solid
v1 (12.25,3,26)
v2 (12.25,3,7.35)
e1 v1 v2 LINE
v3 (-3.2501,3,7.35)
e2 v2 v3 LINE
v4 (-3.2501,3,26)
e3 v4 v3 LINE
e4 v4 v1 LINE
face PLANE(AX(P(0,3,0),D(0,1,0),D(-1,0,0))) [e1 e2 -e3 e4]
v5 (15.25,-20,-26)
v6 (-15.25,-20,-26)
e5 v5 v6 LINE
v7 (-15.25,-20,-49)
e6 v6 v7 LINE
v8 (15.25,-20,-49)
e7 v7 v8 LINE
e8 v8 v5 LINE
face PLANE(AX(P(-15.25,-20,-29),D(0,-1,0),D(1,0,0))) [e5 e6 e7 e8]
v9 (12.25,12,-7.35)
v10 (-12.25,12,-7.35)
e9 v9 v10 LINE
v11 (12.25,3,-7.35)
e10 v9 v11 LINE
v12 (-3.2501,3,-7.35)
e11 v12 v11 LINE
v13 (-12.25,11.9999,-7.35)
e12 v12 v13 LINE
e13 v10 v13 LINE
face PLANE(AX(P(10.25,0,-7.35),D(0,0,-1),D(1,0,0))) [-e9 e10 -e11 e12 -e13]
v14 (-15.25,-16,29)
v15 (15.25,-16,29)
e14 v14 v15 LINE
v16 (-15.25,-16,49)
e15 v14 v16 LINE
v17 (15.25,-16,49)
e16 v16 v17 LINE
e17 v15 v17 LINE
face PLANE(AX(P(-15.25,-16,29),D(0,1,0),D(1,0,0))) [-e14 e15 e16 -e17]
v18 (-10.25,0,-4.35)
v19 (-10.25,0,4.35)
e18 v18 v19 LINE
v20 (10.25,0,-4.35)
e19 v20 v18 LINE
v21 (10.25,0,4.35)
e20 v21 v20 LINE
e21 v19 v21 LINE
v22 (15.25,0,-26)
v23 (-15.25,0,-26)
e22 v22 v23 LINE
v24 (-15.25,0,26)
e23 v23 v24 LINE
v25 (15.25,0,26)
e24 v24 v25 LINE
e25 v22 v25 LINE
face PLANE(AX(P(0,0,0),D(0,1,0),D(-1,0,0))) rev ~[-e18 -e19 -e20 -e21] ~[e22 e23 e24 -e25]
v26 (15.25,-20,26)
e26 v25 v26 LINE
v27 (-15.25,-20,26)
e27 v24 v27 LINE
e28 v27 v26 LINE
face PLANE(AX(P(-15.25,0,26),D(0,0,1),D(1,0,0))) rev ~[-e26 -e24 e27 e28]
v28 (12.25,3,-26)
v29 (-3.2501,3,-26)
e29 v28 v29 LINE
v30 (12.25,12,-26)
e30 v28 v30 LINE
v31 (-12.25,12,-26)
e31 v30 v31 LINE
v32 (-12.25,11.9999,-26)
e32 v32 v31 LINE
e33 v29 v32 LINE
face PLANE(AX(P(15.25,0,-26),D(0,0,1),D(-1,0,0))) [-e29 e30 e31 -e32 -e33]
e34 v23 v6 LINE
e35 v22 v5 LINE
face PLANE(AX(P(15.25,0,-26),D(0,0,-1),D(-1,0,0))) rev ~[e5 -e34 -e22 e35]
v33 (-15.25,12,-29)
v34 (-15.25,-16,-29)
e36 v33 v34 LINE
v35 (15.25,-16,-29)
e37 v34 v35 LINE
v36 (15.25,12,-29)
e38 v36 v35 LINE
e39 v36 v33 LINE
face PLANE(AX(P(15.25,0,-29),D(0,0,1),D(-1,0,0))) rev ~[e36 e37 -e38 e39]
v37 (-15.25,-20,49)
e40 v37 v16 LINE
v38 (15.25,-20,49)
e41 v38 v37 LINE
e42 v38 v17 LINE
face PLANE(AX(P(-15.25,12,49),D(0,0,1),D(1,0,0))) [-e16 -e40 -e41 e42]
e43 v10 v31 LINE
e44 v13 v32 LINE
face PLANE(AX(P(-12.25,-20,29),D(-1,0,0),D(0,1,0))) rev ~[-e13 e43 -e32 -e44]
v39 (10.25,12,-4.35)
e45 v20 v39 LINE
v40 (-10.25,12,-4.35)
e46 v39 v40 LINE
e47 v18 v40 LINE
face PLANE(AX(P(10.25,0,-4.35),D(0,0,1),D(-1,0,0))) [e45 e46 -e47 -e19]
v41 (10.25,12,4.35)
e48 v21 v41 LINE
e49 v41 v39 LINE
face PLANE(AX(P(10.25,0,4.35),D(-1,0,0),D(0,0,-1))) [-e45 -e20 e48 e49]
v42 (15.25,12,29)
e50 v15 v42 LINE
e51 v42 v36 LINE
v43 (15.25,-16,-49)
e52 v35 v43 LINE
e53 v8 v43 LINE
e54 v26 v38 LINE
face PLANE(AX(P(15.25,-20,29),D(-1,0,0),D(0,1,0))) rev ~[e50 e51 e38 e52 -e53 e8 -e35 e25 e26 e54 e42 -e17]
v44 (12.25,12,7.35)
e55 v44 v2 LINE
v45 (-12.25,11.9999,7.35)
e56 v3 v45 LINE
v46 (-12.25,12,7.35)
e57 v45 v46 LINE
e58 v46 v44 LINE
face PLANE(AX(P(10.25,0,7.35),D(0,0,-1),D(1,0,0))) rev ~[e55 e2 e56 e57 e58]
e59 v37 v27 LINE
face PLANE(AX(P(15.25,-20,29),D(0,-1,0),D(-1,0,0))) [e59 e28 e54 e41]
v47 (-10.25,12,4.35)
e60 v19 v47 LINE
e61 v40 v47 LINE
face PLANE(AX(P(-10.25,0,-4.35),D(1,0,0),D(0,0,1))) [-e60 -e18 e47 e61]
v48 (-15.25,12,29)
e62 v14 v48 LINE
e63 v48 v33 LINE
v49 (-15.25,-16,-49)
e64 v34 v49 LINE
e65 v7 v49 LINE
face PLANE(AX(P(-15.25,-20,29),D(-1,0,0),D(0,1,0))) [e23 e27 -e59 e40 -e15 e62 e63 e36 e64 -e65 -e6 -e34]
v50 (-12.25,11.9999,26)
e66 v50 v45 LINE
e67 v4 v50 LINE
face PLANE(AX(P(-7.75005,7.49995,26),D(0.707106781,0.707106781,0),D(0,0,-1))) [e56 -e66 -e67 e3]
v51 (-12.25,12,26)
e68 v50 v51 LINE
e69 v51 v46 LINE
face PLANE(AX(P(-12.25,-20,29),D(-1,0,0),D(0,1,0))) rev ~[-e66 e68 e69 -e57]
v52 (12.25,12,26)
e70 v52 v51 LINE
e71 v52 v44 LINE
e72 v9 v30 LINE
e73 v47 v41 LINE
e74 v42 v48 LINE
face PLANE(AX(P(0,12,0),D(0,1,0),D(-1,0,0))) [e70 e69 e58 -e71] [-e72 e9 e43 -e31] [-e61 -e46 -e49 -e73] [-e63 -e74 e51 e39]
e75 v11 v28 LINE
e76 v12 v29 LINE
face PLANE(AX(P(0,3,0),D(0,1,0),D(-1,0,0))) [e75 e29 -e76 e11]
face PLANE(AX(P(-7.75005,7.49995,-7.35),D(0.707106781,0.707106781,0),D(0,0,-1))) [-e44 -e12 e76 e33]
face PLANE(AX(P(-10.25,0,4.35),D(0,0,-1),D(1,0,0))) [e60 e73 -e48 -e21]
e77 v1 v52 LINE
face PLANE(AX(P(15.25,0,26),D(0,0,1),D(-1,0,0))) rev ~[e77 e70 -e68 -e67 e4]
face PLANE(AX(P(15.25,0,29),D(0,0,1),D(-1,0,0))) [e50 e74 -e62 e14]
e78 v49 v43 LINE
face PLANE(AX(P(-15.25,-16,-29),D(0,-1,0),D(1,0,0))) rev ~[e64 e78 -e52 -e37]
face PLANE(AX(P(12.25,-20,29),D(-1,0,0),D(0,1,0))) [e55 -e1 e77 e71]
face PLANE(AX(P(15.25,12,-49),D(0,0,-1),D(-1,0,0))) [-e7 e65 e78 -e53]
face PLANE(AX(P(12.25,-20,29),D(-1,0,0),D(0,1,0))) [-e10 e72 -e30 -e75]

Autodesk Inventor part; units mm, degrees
ref_plane "YZ Plane" through (0, 0, 0) normal (1, 0, 0) x (0, 1, 0)
ref_plane "XZ Plane" through (0, 0, 0) normal (0, 1, 0) x (-1, 0, 0)
ref_plane "XY Plane" through (0, 0, 0) normal (0, 0, 1) x (1, 0, 0)
sketch "Sketch1" plane through (0, 0, 0) normal (0, 1, 0) x (-1, 0, 0)
  line L0 (10.25, 4.35) -> (-10.25, 4.35)
  line L1 (-10.25, 4.35) -> (-10.25, -4.35)
  line L2 (-10.25, -4.35) -> (10.25, -4.35)
  line L3 (10.25, -4.35) -> (10.25, 4.35)
  line L4 (15.25, 26) -> (-15.25, 26)
  line L5 (-15.25, 26) -> (-15.25, -26)
  line L6 (-15.25, -26) -> (15.25, -26)
  line L7 (15.25, -26) -> (15.25, 26)
  line L8 (15.25, 26) -> (-15.25, 26)
  line L9 (-15.25, 26) -> (-15.25, 29)
  line L10 (-15.25, 29) -> (15.25, 29)
  line L11 (15.25, 29) -> (15.25, 26)
  line L12 (15.25, -26) -> (-15.25, -26)
  line L13 (-15.25, -26) -> (-15.25, -29)
  line L14 (-15.25, -29) -> (15.25, -29)
  line L15 (15.25, -29) -> (15.25, -26)
  point P0 (0, 0)
  point P1 (0, 4.35)
  point P2 (10.25, 0)
  point P3 (0, 26)
  point P4 (15.25, 0)
  dimension "d0" = 8.7
  dimension "d1" = 20.5
  dimension "d2" = 52
  dimension "d3" = 5
  dimension "d4" = 3
  dimension "d5" = 3
extrude "Extrusion1" add sketch "Sketch1" along normal blind 12
extrude "Extrusion2" add sketch "Sketch1" against normal blind 20 contours L4 L9 L10 L11 | L15 L14 L13 L6
sketch "Sketch2" plane through (0, -20, 0) normal (0, -1, 0) x (1, 0, 0)
  point P0 (0, 0)
sketch "Sketch3" plane through (-15.25, 12, 29) normal (0, 0, 1) x (1, 0, 0)
  line L0 (30.5, -32) -> (30.5, 0) projected
  line L1 (0, 0) -> (30.5, 0) projected
  line L2 (0, -32) -> (0, 0) projected
  line L3 (30.5, -32) -> (0, -32) projected
  line L4 (0, -32) -> (0, 0) projected
  line L5 (30.5, -32) -> (0, -32)
  line L6 (0, -32) -> (0, -28)
  line L7 (0, -28) -> (30.5, -28)
  line L8 (30.5, -28) -> (30.5, -32)
  point P0 (15.25, -12)
  dimension "d10" = 4
sketch "Sketch4" plane through (15.25, 12, -29) normal (0, 0, -1) x (-1, 0, 0)
  line L0 (30.5, -32) -> (30.5, 0) projected
  line L1 (0, 0) -> (30.5, 0) projected
  line L2 (0, -32) -> (0, 0) projected
  line L3 (30.5, -32) -> (0, -32) projected
  line L4 (30.5, -32) -> (30.5, 0) projected
  line L5 (0, -32) -> (30.5, -32)
  line L6 (30.5, -32) -> (30.5, -28)
  line L7 (30.5, -28) -> (0, -28)
  line L8 (0, -28) -> (0, -32)
  point P0 (15.25, -12)
  dimension "d11" = 4
extrude "Extrusion3" add sketch "Sketch4" along normal blind 20 contours L3 L2 L7 L0
extrude "Extrusion4" add sketch "Sketch3" along normal blind 20 contours L3 L2 L7 L0
shell "Shell1" thickness 3 removed faces 1 at (-3.4167, 12, -20.7833)
chamfer "Chamfer1" distance 9 angle 45 2 edges at (-12.25, 3, -16.675) (-12.25, 3, 16.675)
properties part number "servo halter"
